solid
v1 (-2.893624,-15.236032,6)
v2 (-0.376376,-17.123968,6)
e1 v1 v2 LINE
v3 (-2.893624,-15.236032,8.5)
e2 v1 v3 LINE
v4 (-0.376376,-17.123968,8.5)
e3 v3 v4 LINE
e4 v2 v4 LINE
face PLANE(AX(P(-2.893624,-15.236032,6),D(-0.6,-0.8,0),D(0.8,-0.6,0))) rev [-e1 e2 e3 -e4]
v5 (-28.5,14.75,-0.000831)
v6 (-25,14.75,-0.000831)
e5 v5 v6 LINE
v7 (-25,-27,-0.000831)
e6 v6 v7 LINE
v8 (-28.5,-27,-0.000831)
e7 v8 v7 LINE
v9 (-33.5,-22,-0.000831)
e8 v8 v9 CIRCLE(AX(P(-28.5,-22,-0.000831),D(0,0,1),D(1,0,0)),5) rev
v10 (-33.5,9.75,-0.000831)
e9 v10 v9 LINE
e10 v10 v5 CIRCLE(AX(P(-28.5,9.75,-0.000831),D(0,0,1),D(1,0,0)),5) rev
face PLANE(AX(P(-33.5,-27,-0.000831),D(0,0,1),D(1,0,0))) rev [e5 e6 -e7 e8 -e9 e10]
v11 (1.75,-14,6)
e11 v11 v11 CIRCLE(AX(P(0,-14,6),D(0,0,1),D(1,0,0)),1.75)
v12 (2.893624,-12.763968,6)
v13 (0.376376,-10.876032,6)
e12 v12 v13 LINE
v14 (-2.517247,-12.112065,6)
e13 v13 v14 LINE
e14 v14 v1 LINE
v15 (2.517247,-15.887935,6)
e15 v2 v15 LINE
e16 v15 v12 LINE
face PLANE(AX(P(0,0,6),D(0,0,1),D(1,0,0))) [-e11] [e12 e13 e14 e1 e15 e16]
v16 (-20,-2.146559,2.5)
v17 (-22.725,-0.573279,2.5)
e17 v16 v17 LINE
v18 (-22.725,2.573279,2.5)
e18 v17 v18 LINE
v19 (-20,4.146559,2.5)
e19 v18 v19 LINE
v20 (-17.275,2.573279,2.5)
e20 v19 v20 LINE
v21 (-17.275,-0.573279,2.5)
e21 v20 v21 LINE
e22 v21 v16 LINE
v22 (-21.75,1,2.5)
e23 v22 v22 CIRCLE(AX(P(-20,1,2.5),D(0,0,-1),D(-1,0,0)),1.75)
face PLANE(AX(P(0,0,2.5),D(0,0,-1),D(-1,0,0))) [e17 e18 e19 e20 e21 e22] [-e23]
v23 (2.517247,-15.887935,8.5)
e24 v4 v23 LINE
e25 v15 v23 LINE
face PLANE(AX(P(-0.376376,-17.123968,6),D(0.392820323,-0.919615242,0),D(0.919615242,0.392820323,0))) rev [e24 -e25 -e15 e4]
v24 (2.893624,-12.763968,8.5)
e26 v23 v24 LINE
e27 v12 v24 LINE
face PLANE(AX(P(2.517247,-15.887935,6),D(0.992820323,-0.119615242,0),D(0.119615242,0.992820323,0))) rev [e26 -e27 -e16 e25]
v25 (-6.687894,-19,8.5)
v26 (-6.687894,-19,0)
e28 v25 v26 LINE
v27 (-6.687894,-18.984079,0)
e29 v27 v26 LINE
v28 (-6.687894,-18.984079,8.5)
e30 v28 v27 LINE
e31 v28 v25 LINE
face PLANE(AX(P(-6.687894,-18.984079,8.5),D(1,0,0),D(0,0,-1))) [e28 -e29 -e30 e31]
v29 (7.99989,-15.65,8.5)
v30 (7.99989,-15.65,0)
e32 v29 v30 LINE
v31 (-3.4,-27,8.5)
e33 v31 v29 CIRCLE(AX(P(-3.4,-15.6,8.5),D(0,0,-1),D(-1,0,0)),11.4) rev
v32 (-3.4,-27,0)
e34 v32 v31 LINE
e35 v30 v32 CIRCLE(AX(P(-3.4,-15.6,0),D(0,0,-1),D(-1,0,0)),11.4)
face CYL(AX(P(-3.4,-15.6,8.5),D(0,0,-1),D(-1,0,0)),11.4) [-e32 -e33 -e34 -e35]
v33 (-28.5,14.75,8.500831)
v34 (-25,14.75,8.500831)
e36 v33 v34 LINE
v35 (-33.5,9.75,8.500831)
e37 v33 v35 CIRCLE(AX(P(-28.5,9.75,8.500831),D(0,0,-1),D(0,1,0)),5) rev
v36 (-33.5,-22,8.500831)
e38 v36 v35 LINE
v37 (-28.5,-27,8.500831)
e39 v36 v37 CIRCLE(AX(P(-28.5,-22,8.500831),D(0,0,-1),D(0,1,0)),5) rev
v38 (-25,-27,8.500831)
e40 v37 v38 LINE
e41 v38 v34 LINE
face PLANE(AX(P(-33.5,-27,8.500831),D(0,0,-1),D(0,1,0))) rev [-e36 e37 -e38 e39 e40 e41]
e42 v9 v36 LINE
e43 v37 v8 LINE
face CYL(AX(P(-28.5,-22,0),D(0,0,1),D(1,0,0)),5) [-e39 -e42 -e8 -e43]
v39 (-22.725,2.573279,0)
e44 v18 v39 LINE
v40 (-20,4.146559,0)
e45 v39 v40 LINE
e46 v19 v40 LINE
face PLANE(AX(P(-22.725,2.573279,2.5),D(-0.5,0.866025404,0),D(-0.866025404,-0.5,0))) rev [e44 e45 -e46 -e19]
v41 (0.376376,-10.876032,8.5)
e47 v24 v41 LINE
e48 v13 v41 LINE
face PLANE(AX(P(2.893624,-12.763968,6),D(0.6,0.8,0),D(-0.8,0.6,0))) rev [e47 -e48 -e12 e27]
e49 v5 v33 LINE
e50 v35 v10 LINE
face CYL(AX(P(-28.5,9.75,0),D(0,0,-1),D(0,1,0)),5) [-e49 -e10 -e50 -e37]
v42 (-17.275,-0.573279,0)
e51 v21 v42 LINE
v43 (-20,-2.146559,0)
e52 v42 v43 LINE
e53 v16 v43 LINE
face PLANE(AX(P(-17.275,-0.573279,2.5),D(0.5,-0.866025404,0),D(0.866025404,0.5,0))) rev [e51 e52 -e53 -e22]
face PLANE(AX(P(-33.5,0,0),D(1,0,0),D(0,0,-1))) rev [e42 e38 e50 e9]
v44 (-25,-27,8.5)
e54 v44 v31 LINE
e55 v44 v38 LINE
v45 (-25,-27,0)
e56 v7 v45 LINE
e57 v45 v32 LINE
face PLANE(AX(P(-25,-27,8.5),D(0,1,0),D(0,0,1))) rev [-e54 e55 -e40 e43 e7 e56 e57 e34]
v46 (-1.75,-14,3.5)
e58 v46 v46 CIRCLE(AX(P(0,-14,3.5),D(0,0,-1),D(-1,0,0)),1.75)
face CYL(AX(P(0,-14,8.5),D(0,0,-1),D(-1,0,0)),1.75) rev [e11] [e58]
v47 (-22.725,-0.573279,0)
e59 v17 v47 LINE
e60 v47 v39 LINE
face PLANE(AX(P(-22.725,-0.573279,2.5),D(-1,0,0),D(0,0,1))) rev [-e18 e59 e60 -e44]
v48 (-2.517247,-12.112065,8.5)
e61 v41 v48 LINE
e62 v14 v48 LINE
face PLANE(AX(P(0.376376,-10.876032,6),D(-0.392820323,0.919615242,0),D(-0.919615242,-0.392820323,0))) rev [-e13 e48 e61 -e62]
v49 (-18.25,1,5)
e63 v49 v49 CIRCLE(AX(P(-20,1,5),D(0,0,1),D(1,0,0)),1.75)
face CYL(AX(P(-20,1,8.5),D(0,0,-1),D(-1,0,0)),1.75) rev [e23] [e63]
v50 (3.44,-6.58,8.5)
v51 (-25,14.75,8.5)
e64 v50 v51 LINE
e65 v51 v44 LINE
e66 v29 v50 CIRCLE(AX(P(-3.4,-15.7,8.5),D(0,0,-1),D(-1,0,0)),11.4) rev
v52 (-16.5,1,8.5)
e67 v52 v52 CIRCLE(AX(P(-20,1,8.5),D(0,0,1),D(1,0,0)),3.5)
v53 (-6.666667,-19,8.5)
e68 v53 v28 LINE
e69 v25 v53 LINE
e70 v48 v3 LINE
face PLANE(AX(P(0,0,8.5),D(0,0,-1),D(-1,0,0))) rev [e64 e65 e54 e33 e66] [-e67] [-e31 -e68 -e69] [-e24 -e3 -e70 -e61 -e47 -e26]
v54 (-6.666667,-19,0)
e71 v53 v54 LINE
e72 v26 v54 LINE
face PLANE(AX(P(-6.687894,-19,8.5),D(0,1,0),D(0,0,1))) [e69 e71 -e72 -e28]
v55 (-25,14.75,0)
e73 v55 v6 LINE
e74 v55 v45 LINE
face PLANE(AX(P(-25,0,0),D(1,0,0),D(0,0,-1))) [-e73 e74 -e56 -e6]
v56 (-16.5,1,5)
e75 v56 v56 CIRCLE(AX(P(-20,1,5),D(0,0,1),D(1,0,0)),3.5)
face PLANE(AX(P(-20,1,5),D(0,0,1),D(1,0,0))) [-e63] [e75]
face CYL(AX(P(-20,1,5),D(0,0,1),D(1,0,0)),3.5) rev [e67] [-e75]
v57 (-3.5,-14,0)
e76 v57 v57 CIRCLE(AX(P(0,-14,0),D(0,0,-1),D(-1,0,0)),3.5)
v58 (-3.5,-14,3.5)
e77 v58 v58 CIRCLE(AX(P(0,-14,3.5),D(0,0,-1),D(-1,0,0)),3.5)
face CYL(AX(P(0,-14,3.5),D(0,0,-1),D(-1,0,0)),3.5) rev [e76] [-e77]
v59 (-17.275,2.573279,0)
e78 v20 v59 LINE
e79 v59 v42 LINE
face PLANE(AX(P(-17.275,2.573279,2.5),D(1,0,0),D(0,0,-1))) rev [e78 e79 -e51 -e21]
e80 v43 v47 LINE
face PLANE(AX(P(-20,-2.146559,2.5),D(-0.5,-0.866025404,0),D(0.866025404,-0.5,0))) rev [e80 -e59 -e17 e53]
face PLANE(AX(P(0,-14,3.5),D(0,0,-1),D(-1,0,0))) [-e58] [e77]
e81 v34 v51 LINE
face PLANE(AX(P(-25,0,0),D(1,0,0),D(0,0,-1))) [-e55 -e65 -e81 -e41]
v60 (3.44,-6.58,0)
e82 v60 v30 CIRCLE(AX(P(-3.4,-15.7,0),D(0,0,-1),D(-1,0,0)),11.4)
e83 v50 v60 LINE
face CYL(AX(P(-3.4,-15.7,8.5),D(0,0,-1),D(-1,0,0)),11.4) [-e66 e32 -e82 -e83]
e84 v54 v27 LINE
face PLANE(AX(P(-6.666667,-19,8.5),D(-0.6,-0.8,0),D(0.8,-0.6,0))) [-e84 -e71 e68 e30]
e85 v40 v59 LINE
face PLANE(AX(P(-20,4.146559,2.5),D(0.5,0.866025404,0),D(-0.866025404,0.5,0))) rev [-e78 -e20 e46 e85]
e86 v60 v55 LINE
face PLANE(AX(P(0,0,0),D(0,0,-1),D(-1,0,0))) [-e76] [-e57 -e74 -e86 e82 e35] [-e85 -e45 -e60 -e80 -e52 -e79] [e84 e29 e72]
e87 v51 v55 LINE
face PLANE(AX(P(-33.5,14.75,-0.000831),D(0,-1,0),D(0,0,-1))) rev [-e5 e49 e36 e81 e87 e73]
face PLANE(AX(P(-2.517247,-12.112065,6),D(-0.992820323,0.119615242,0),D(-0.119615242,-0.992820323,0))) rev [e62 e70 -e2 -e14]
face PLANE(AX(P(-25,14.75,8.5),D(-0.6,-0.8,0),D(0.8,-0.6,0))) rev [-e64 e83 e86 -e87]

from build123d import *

# Parameters (mm, degrees)
SKETCH1_R           = 1.75
BOSS_EXTRUDE1_DEPTH = 8.5
CUT_EXTRUDE2_DEPTH  = 2.5
CUT_EXTRUDE3_DEPTH  = 2.5
SKETCH5_R           = 3.5
CUT_EXTRUDE4_DEPTH  = 3.5
SKETCH6_R           = 3.5
CUT_EXTRUDE5_DEPTH  = 3.5
FILLET1_R           = 11.4
SKETCH7_W           = 8.501662988
SKETCH7_H           = 41.75
BOSS_EXTRUDE3_DEPTH = 8.5
FILLET2_R           = 5
FILLET3_R           = 5


with BuildPart() as part:
    # Sketch1 → Boss-Extrude1 (new body)
    with BuildSketch(Plane.XY):
        Polygon((8, -10), (8, -27), (-25, -27), (-25, 14.75), align=None)
        with Locations((-20, 1)):
            Circle(SKETCH1_R, mode=Mode.SUBTRACT)
        with Locations((0, -14)):
            Circle(SKETCH1_R, mode=Mode.SUBTRACT)
        Polygon((-6.687894354, -19), (-6.666666667, -19), (-6.687894354, -18.984079234), align=None, mode=Mode.SUBTRACT)
    extrude(amount=BOSS_EXTRUDE1_DEPTH)

    # Sketch3 → Cut-Extrude2 (cut)
    with BuildSketch(Plane(origin=(0, 0, 0), x_dir=(-1, 0, 0), z_dir=(0, 0, -1))):
        Polygon((22.725, 2.573279484), (20, 4.146558967), (17.275, 2.573279484), (17.275, -0.573279484), (20, -2.146558967), (22.725, -0.573279484), align=None)
    extrude(amount=-CUT_EXTRUDE2_DEPTH, mode=Mode.SUBTRACT)

    # Sketch4 → Cut-Extrude3 (cut)
    with BuildSketch(Plane.XY.offset(8.5)):
        Polygon((-2.517247174, -12.11206462), (-2.893623587, -15.23603231), (-0.376376413, -17.12396769), (2.517247174, -15.88793538), (2.893623587, -12.76396769), (0.376376413, -10.87603231), align=None)
    extrude(amount=-CUT_EXTRUDE3_DEPTH, mode=Mode.SUBTRACT)

    # Sketch5 → Cut-Extrude4 (cut)
    with BuildSketch(Plane.XY.offset(8.5)):
        with Locations((-20, 1)):
            Circle(SKETCH5_R)
    extrude(amount=-CUT_EXTRUDE4_DEPTH, mode=Mode.SUBTRACT)

    # Sketch6 → Cut-Extrude5 (cut)
    with BuildSketch(Plane(origin=(0, 0, 0), x_dir=(-1, 0, 0), z_dir=(0, 0, -1))):
        with Locations((0, -14)):
            Circle(SKETCH6_R)
    extrude(amount=-CUT_EXTRUDE5_DEPTH, mode=Mode.SUBTRACT)

    # Fillet1
    # the kernel refuses this fillet: 11.4 mm, written as the material it takes off along each edge
    with BuildSketch(Plane(origin=(8, -10, -14.25), x_dir=(0, -1, 0), z_dir=(0, 0, 1))) as fillet1_piece_1:
        with BuildLine():
            CenterArc((FILLET1_R * 0.5, -FILLET1_R), FILLET1_R, 90, 53.130102354)
            Line((-FILLET1_R * 0.3, -FILLET1_R * 0.4), (0, 0))
            Line((0, 0), (FILLET1_R * 0.5, 0))
        make_face()
    extrude(amount=37, mode=Mode.SUBTRACT)
    with BuildSketch(Plane(origin=(8, -27, -28.5), x_dir=(0, 1, 0), z_dir=(0, 0, 1))) as fillet1_piece_2:
        with BuildLine():
            CenterArc((FILLET1_R, FILLET1_R), FILLET1_R, 180, 90)
            Line((0, FILLET1_R), (0, 0))
            Line((0, 0), (FILLET1_R, 0))
        make_face()
    extrude(amount=65.5, mode=Mode.SUBTRACT)

    # Sketch7 → Boss-Extrude3 (add)
    with BuildSketch(Plane.ZY.offset(25)):
        with Locations((4.25, -6.125)):
            Rectangle(SKETCH7_W, SKETCH7_H)
    extrude(amount=BOSS_EXTRUDE3_DEPTH)

    # Fillet2
    fillet2_edges = [part.edges().sort_by_distance(p)[0] for p in [
        (-33.5, -27, 4.25),
    ]]
    fillet(fillet2_edges, radius=FILLET2_R)

    # Fillet3
    fillet3_edges = [part.edges().sort_by_distance(p)[0] for p in [
        (-33.5, 14.75, 4.25),
    ]]
    fillet(fillet3_edges, radius=FILLET3_R)


solid = part.part
